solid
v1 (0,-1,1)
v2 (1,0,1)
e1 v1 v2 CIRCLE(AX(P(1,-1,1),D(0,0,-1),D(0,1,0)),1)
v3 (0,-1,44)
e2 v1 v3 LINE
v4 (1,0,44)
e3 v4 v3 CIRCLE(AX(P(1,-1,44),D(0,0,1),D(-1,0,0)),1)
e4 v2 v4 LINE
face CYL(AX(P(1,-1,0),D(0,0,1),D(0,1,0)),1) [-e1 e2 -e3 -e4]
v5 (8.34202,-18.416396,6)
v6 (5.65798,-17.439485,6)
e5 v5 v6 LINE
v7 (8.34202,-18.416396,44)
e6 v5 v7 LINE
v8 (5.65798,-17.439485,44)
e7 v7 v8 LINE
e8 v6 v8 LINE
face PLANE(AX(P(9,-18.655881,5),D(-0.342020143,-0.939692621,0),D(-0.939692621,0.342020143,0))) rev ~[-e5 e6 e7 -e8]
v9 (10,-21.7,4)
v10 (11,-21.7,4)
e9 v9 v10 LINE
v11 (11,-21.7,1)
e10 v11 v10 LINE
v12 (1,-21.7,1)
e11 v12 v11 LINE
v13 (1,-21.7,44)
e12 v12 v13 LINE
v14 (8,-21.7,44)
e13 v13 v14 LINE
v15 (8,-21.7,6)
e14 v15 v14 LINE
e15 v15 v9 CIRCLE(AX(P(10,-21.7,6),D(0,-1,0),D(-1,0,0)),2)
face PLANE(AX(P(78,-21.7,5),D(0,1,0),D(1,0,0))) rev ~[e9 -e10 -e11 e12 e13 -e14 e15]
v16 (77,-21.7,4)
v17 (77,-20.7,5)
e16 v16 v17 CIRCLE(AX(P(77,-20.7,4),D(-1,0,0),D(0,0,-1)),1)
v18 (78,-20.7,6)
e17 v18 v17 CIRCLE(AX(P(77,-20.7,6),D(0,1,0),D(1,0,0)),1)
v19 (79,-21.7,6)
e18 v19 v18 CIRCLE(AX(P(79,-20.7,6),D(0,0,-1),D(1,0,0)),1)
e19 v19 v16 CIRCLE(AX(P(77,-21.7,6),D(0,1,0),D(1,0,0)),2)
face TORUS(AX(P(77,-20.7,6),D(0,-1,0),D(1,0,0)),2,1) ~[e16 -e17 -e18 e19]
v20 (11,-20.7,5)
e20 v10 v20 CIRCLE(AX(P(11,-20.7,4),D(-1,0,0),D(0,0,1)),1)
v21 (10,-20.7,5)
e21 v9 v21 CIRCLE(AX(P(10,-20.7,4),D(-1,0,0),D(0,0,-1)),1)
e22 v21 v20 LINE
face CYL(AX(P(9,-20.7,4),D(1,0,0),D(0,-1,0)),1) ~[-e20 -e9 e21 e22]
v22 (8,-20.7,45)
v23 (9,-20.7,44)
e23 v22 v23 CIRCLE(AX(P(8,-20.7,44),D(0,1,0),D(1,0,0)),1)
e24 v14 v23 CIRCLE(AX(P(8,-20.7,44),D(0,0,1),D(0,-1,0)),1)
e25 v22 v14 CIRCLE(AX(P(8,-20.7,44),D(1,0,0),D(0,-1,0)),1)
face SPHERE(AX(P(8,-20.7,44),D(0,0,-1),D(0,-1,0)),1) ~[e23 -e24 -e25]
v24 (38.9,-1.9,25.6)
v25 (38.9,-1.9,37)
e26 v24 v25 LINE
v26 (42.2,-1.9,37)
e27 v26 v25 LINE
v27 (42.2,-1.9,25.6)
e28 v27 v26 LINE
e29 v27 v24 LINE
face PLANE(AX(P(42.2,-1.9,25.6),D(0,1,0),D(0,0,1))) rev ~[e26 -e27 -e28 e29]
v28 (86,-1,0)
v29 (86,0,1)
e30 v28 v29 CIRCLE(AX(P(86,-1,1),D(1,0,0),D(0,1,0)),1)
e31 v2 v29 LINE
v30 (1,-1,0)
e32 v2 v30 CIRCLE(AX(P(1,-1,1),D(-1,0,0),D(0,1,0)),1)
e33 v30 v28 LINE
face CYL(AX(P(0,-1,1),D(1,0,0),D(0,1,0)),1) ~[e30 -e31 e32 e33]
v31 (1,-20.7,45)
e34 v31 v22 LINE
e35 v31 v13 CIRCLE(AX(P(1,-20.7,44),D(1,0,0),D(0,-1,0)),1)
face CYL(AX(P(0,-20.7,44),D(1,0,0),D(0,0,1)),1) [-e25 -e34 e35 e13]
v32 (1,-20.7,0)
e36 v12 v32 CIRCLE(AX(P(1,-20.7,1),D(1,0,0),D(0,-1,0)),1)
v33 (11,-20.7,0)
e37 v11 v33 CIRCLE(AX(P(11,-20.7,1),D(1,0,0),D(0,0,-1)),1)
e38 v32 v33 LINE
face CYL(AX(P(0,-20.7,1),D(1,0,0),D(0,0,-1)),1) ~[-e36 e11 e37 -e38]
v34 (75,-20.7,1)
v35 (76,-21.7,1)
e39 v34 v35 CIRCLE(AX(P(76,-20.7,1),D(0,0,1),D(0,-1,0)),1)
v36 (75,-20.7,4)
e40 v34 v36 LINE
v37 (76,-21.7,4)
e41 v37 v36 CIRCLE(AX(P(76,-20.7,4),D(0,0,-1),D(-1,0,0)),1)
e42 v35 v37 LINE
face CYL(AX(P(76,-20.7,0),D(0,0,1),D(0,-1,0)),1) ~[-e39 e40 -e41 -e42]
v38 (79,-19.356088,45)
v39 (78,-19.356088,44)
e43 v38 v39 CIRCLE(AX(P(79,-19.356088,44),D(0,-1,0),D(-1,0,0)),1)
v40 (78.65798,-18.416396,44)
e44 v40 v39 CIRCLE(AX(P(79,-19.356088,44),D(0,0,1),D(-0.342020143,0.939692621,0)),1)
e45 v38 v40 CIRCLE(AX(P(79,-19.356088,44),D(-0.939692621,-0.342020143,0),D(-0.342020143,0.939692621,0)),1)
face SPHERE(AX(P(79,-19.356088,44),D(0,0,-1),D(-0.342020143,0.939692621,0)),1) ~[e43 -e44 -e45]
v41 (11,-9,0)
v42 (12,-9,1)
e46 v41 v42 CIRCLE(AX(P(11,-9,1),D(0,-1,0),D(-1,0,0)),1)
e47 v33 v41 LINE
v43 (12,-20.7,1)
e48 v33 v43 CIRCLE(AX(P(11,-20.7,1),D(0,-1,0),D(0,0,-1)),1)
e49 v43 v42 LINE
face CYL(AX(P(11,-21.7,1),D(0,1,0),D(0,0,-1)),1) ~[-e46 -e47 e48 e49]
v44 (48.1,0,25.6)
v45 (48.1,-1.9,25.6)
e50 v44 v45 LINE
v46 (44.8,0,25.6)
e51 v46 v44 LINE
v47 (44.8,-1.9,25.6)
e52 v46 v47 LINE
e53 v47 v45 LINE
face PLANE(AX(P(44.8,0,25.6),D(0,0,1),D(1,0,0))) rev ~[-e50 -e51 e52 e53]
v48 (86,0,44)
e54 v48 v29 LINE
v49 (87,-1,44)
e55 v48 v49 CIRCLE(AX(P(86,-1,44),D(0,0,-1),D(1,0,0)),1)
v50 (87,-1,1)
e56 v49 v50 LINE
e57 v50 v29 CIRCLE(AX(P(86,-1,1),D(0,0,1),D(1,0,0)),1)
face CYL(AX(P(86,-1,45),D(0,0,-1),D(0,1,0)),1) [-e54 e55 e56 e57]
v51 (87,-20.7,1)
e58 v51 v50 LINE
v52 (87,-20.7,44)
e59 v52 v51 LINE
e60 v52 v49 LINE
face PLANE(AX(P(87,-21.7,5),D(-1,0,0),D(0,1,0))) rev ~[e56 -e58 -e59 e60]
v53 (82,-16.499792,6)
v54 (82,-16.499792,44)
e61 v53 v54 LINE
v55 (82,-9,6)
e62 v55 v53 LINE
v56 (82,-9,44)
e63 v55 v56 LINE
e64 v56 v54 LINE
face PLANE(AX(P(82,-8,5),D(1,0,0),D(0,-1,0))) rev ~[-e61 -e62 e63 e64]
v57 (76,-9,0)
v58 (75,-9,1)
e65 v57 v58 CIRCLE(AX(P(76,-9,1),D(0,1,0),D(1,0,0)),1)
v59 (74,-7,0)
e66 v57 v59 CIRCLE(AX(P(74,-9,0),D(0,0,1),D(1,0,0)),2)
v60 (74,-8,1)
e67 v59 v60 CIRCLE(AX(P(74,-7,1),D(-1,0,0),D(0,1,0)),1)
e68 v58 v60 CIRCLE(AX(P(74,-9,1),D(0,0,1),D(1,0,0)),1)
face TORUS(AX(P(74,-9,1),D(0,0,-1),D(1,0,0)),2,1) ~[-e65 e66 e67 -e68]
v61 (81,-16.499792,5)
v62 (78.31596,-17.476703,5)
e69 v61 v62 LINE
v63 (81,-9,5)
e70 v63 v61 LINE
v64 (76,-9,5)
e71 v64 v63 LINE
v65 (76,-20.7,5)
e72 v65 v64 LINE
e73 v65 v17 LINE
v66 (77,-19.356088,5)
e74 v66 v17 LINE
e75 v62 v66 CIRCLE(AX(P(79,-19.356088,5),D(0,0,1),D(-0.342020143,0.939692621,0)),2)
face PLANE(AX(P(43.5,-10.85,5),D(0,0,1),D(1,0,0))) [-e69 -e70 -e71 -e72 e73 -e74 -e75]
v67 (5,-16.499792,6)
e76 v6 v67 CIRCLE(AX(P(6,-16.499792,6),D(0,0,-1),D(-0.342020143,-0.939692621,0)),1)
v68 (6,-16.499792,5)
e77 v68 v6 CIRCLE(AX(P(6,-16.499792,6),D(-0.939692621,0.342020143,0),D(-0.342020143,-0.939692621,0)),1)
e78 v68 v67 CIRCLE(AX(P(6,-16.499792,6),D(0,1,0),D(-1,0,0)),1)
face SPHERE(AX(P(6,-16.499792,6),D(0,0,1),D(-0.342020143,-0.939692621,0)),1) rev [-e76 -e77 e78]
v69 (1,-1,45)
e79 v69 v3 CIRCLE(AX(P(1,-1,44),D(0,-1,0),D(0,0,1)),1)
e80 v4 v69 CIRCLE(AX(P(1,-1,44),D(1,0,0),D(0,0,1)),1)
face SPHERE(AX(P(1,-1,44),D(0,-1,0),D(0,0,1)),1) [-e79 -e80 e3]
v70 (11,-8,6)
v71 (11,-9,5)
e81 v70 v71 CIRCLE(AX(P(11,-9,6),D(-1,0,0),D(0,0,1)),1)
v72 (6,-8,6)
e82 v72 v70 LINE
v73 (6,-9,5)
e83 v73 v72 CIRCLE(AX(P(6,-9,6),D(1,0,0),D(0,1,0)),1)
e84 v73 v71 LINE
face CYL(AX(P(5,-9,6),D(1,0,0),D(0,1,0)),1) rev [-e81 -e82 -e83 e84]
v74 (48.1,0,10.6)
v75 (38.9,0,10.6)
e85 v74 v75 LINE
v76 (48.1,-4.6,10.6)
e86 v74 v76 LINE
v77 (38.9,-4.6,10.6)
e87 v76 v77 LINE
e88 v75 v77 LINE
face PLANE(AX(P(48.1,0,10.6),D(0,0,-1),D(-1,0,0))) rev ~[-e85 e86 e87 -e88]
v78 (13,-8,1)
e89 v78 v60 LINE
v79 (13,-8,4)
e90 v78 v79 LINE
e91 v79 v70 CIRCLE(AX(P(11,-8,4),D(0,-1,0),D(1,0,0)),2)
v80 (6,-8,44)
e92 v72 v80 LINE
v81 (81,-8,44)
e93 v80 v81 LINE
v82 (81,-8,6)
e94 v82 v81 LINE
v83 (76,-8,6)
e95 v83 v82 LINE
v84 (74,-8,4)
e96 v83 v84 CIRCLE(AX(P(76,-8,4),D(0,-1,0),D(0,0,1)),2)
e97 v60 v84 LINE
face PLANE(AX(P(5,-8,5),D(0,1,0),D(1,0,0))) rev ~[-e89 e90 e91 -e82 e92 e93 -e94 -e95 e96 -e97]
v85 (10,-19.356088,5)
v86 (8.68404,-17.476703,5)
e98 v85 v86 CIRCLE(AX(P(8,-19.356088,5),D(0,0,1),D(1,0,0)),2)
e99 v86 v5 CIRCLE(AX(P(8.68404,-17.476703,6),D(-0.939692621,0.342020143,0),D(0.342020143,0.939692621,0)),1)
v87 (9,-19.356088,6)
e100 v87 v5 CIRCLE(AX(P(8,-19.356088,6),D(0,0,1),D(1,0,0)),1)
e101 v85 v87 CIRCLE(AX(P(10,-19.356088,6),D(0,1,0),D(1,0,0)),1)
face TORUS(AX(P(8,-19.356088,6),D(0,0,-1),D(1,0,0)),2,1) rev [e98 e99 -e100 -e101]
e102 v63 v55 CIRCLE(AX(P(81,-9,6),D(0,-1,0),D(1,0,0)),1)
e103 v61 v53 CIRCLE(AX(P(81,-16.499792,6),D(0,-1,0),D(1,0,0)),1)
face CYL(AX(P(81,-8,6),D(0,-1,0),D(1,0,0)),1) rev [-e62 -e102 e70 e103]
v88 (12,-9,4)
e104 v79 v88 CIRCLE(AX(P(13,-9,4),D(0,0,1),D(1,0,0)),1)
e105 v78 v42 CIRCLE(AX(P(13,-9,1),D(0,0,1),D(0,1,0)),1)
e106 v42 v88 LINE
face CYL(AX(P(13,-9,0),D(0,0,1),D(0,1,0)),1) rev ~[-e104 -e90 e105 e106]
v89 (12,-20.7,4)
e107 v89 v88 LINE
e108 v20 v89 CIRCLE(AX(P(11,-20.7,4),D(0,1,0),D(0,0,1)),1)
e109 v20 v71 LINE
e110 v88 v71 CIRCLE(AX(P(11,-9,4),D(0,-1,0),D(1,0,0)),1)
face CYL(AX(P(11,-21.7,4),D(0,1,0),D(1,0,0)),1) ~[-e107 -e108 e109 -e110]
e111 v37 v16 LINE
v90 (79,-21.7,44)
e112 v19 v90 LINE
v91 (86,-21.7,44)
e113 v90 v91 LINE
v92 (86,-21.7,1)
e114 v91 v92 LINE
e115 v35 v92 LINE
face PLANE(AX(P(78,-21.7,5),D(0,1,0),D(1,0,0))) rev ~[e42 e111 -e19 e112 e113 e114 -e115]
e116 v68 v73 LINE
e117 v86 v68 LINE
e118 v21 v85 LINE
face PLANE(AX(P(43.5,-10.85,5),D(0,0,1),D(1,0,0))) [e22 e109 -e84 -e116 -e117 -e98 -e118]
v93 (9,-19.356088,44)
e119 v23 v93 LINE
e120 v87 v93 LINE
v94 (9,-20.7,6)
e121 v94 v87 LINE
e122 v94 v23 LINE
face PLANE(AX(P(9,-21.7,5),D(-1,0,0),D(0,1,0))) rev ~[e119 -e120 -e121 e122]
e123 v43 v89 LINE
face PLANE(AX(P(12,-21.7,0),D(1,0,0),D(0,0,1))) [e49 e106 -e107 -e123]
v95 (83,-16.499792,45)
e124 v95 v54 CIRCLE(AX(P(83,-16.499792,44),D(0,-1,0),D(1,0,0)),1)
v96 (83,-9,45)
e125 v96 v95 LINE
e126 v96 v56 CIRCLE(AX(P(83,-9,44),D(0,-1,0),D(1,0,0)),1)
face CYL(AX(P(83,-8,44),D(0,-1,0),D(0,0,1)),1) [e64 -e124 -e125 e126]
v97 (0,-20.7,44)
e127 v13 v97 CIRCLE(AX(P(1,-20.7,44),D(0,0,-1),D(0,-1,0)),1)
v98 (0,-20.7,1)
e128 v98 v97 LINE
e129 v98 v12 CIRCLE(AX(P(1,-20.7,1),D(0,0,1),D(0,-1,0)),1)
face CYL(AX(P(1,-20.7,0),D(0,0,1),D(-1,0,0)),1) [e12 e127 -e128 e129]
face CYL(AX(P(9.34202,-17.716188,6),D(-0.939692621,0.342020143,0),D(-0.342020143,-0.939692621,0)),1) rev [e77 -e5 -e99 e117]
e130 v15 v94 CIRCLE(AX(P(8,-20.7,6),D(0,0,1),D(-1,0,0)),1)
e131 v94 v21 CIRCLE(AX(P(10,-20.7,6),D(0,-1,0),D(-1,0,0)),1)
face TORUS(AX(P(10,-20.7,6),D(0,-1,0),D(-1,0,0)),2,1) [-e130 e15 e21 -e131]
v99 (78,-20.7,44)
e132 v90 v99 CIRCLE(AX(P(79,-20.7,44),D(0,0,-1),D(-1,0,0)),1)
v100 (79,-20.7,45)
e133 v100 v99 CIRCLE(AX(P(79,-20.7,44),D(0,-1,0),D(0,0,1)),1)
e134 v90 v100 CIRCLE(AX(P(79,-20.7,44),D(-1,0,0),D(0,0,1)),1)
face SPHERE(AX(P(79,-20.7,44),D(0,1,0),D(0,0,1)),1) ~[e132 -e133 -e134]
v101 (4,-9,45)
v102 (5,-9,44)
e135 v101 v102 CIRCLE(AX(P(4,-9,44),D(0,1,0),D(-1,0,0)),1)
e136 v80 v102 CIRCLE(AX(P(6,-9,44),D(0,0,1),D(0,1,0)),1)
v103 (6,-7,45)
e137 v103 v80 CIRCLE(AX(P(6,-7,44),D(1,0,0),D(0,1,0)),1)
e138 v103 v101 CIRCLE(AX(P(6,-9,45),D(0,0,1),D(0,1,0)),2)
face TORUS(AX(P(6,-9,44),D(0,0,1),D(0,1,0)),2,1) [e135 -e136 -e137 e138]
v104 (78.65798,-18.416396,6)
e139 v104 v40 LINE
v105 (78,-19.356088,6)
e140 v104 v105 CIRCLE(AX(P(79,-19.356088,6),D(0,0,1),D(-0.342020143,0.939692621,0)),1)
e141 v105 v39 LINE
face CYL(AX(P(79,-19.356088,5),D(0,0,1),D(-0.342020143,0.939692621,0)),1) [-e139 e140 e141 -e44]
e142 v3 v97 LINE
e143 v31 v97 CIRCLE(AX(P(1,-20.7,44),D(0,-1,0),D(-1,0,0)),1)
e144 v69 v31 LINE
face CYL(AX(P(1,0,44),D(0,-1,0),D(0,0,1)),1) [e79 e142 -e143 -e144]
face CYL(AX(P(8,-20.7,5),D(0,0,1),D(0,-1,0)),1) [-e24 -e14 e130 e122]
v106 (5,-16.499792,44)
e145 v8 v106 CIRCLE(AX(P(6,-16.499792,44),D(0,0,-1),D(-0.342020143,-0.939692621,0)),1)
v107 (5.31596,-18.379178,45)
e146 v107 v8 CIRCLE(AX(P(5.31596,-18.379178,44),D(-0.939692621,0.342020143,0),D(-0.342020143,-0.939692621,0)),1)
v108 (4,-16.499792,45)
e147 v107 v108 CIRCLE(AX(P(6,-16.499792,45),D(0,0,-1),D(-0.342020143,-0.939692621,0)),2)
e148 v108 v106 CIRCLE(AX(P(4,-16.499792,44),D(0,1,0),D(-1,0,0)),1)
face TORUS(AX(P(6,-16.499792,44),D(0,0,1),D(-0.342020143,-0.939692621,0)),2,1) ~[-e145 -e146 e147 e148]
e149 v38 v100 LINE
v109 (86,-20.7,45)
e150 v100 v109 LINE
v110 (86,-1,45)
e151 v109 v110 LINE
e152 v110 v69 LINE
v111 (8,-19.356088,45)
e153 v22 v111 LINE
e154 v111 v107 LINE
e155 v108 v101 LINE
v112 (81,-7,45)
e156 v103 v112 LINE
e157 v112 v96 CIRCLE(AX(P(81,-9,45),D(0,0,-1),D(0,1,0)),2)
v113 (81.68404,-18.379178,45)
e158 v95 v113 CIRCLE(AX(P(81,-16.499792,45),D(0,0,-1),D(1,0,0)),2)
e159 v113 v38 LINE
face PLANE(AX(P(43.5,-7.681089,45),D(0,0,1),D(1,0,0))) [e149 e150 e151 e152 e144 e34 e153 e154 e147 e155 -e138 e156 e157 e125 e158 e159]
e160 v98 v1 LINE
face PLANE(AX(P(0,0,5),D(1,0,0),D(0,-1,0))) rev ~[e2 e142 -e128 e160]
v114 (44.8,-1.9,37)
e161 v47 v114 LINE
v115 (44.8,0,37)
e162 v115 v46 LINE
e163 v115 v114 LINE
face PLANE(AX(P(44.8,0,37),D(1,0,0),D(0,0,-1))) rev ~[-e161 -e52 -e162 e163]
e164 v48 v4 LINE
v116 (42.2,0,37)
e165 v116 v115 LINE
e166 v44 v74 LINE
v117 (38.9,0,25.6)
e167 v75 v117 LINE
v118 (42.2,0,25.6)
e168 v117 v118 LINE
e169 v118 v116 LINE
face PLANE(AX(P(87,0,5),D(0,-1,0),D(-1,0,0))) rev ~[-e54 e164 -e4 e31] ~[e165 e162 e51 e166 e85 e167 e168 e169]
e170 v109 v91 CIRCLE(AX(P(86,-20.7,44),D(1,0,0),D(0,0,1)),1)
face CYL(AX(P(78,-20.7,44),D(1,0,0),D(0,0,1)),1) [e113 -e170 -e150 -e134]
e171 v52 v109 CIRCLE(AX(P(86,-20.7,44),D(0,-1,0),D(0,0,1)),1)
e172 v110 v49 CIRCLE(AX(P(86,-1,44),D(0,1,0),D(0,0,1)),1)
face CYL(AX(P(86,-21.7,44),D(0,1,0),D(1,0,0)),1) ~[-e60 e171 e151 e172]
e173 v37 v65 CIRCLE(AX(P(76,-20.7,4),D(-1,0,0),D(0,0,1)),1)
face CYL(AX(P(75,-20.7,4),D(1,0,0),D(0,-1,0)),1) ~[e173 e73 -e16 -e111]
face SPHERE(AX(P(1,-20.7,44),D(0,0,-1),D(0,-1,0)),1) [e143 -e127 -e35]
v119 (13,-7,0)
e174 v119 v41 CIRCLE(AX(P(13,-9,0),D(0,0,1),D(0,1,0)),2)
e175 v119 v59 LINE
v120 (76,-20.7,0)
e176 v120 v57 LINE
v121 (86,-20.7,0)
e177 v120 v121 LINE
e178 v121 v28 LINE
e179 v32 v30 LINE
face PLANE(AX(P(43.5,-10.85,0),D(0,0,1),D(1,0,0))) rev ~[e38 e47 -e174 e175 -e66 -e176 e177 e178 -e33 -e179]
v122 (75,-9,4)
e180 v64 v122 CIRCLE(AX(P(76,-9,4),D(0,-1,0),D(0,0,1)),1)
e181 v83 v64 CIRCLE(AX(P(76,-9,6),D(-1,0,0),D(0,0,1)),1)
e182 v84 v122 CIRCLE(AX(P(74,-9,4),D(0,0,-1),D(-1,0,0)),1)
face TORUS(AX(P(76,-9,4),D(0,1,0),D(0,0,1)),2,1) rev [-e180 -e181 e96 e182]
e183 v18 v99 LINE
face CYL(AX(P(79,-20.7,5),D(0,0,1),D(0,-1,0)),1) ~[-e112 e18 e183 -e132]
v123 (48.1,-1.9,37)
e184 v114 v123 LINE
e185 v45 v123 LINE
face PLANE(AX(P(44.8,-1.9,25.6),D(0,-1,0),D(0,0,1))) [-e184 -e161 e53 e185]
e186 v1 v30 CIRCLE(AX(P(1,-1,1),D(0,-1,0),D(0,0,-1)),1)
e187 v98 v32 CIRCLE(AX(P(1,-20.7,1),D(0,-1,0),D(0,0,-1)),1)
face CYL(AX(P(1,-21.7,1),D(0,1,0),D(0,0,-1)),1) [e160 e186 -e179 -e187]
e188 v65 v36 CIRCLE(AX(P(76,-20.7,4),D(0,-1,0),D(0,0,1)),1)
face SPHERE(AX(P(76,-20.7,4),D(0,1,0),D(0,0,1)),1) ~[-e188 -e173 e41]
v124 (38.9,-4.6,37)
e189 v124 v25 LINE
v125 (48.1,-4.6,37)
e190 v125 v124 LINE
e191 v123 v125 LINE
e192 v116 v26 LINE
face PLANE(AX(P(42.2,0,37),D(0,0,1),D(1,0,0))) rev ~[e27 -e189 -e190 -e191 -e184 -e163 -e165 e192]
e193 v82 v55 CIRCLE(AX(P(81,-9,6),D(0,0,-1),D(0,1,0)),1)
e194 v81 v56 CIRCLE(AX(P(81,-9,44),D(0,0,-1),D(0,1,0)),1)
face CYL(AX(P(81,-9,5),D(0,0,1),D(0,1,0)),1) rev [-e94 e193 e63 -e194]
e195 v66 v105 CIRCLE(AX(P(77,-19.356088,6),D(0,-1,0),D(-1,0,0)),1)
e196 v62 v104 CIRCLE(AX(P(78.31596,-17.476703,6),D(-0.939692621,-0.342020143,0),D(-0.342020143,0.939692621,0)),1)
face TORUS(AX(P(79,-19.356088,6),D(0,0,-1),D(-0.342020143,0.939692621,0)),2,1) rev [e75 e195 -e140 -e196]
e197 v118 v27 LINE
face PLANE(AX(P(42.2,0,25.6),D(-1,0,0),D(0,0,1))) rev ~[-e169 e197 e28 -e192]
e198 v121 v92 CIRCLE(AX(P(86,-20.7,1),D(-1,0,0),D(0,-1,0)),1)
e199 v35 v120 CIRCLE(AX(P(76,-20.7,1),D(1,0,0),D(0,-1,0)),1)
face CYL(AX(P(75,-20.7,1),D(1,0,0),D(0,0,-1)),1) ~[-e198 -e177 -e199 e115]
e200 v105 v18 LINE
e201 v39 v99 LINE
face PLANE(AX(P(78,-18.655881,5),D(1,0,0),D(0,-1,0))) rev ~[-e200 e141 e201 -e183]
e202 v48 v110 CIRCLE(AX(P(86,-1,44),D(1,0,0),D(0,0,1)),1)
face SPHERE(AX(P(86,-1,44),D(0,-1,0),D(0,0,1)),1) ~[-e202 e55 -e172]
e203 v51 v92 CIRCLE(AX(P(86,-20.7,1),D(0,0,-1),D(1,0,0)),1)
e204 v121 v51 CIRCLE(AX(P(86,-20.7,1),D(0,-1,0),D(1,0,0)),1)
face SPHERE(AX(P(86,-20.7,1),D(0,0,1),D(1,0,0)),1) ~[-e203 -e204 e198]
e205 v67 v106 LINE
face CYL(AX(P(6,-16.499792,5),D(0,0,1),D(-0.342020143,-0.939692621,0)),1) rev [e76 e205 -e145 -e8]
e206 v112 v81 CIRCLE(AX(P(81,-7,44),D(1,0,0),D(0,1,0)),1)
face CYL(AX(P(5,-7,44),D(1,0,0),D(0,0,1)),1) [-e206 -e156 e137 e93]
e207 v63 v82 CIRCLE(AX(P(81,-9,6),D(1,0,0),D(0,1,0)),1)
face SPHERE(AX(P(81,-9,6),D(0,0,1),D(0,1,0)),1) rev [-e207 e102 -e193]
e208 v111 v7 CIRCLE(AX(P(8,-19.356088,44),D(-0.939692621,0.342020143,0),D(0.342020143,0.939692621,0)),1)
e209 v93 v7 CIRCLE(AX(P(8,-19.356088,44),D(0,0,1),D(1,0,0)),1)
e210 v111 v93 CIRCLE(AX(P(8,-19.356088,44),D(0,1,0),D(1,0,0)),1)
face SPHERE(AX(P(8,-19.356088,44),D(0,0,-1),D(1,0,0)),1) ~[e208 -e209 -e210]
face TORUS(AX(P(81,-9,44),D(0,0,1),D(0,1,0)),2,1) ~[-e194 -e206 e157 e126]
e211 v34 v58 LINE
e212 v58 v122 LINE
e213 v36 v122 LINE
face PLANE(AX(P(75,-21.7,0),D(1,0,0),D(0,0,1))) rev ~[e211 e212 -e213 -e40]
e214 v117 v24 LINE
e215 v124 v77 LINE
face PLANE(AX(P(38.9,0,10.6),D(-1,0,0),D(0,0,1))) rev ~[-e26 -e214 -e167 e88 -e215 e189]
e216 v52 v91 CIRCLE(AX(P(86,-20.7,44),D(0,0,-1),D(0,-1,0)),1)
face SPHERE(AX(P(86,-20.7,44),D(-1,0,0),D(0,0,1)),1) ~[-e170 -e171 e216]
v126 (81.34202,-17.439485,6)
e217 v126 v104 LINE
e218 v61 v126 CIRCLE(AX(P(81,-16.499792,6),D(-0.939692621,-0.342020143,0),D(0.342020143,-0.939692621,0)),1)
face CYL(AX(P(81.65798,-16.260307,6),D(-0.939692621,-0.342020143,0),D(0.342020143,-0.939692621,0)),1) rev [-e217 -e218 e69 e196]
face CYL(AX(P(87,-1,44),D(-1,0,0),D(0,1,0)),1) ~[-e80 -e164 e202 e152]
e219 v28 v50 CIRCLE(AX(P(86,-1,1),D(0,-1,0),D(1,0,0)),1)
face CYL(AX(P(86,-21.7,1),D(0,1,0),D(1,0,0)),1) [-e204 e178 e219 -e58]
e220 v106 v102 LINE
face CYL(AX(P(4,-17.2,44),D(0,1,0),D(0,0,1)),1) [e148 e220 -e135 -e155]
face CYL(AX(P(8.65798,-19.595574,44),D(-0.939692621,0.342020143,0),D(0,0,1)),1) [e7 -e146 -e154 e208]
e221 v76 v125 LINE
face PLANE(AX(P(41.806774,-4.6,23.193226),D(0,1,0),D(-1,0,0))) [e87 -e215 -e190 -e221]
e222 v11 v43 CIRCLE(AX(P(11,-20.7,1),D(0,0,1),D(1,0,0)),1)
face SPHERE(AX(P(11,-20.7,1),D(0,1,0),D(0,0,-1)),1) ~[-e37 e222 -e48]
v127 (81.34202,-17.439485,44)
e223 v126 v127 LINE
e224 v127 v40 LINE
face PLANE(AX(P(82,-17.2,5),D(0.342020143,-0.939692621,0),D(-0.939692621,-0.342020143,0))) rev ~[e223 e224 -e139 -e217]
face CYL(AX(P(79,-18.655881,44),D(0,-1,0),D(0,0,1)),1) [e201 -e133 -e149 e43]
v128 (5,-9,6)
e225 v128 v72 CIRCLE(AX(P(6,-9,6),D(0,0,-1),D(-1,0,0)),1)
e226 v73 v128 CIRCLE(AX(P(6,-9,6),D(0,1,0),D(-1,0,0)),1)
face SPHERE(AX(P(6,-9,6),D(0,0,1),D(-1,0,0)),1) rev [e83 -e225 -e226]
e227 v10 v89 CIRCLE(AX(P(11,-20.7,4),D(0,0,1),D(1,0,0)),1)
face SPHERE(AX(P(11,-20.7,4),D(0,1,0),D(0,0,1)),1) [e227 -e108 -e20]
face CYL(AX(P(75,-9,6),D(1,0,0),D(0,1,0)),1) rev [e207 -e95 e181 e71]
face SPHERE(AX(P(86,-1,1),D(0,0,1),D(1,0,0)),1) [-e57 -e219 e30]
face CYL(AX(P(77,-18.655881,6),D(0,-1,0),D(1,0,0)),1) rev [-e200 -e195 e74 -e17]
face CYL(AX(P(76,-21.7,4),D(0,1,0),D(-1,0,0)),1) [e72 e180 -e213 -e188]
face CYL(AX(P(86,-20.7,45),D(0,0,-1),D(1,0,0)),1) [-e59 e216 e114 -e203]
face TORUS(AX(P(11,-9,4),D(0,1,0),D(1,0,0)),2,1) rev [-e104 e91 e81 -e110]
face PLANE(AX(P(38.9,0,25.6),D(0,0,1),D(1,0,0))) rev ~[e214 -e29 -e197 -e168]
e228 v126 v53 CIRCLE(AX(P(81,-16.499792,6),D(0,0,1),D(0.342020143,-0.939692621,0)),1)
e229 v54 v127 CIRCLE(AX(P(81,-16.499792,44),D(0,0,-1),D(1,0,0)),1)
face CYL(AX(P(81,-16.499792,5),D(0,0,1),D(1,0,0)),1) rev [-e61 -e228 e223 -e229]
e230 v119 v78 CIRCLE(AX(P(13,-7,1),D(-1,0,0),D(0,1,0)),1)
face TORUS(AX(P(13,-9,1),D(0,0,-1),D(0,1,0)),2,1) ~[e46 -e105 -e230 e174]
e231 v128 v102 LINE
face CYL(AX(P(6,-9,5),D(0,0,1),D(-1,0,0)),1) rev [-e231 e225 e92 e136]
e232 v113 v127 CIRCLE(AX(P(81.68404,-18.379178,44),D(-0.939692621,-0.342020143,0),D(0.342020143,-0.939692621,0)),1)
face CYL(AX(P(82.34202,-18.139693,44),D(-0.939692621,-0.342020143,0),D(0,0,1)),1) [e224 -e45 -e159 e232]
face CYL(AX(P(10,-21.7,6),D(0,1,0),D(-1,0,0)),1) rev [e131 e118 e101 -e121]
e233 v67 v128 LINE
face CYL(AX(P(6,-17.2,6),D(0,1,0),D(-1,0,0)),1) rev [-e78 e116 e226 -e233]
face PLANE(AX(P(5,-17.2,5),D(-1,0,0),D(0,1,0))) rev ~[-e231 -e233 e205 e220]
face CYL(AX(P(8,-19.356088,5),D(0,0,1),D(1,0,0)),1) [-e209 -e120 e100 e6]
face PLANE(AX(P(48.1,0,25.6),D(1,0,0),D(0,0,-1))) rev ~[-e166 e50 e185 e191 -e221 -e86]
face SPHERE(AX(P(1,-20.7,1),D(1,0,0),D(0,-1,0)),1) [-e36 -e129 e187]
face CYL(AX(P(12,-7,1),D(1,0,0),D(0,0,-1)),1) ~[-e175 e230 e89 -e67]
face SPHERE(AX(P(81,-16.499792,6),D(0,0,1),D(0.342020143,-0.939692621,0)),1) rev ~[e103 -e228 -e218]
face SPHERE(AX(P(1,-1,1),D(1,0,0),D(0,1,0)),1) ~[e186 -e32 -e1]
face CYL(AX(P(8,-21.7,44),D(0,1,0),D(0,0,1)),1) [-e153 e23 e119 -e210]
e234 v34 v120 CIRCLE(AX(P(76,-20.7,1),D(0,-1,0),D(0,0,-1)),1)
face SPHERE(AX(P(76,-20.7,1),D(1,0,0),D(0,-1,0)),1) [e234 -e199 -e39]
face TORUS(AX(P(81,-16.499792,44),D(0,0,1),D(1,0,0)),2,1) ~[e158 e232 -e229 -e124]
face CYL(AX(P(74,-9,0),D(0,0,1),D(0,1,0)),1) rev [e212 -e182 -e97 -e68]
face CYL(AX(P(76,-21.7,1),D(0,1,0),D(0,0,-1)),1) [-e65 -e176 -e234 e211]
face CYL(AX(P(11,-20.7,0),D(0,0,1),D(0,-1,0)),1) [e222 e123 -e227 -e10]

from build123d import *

# Parameters (mm, degrees)
F0_W      = 87
F0_H      = 21.7
F1_DEPTH  = 5
F3_DEPTH  = 40
F5_DEPTH  = 4.6
F6_W      = 2.7
F6_H      = 11.4
F7_DEPTH  = 3.3
F8_W      = 2.7
F8_H      = 11.4
F9_DEPTH  = 3.3
F10_W     = 63
F10_H     = 5
F11_DEPTH = 13.7
F12_R     = 1


with BuildPart() as f1:
    # F0 (on Top) → F1 (new body)
    with BuildSketch(Plane.XY):
        with Locations((43.5, -10.85)):
            Rectangle(F0_W, F0_H)
    extrude(amount=F1_DEPTH)

    # F2 (on face) → F3 (join)
    with BuildSketch(Plane.XY.offset(5)):
        Polygon((87, 0), (0, 0), (0, -21.7), (9, -21.7), (9, -18.6558809371), (5, -17.2), (5, -8), (82, -8), (82, -17.2), (78, -18.6558809371), (78, -21.7), (87, -21.7), align=None)
    extrude(amount=F3_DEPTH)

    # F4 (on face) → F5 (cut)
    with BuildSketch(Plane(origin=(0, 0, 0), x_dir=(-1, 0, 0), z_dir=(0, 1, 0))):
        Polygon((-42.2, 37), (-43.5, 37), (-43.5, 10.6), (-38.9, 10.6), (-38.9, 25.6), (-42.2, 25.6), align=None)
        Polygon((-43.5, 10.6), (-43.5, 37), (-44.8, 37), (-44.8, 25.6), (-48.1, 25.6), (-48.1, 10.6), align=None)
    extrude(amount=-F5_DEPTH, mode=Mode.SUBTRACT)

    # F6 (on face) → F7 (cut)
    with BuildSketch(Plane.YZ.offset(42.2)):
        with Locations((-3.25, 31.3)):
            Rectangle(F6_W, F6_H)
    extrude(amount=-F7_DEPTH, mode=Mode.SUBTRACT)

    # F8 (on face) → F9 (cut)
    with BuildSketch(Plane(origin=(44.8, 0, 0), x_dir=(0, -1, 0), z_dir=(-1, 0, 0))):
        with Locations((3.25, 31.3)):
            Rectangle(F8_W, F8_H)
    extrude(amount=-F9_DEPTH, mode=Mode.SUBTRACT)

    # F10 (on face) → F11 (cut)
    with BuildSketch(Plane.XZ.offset(21.7)):
        with Locations((43.5, 2.5)):
            Rectangle(F10_W, F10_H)
    extrude(amount=-F11_DEPTH, mode=Mode.SUBTRACT)

    # F12
    f12_edges = [f1.edges().sort_by_distance(p)[0] for p in [
        (12, -14.85, 5),
        (12, -14.85, 0),
        (12, -8, 2.5),
        (43.5, -8, 0),
        (5, -8, 25),
        (5, -12.6, 5),
        (9, -18.655881, 25),
        (9, -21.7, 25),
        (10.5, -21.7, 5),
        (9, -20.17794, 5),
        (6, -21.7, 0),
        (0, -21.7, 22.5),
        (43.5, -8, 45),
        (82, -12.6, 45),
        (80, -17.92794, 45),
        (78, -20.17794, 45),
        (82.5, -21.7, 45),
        (87, -10.85, 45),
        (87, -21.7, 22.5),
        (82, -8, 25),
        (78.5, -8, 5),
        (75, -8, 2.5),
        (8.5, -8, 5),
        (78, -21.7, 25),
        (75, -14.85, 5),
        (82, -12.6, 5),
        (76.5, -21.7, 5),
        (78, -20.17794, 5),
        (78, -18.655881, 25),
        (82, -17.2, 25),
        (5, -17.2, 25),
        (4.5, -21.7, 45),
        (9, -20.17794, 45),
        (0, -10.85, 45),
        (43.5, 0, 45),
        (87, 0, 22.5),
        (87, -10.85, 0),
        (81, -21.7, 0),
        (75, -21.7, 2.5),
        (12, -21.7, 2.5),
        (43.5, 0, 0),
        (0, 0, 22.5),
        (0, -10.85, 0),
        (75, -14.85, 0),
        (7, -17.92794, 45),
        (5, -12.6, 45),
        (7, -17.92794, 5),
        (80, -17.92794, 5),
    ]]
    fillet(f12_edges, radius=F12_R)


solid = f1.part
